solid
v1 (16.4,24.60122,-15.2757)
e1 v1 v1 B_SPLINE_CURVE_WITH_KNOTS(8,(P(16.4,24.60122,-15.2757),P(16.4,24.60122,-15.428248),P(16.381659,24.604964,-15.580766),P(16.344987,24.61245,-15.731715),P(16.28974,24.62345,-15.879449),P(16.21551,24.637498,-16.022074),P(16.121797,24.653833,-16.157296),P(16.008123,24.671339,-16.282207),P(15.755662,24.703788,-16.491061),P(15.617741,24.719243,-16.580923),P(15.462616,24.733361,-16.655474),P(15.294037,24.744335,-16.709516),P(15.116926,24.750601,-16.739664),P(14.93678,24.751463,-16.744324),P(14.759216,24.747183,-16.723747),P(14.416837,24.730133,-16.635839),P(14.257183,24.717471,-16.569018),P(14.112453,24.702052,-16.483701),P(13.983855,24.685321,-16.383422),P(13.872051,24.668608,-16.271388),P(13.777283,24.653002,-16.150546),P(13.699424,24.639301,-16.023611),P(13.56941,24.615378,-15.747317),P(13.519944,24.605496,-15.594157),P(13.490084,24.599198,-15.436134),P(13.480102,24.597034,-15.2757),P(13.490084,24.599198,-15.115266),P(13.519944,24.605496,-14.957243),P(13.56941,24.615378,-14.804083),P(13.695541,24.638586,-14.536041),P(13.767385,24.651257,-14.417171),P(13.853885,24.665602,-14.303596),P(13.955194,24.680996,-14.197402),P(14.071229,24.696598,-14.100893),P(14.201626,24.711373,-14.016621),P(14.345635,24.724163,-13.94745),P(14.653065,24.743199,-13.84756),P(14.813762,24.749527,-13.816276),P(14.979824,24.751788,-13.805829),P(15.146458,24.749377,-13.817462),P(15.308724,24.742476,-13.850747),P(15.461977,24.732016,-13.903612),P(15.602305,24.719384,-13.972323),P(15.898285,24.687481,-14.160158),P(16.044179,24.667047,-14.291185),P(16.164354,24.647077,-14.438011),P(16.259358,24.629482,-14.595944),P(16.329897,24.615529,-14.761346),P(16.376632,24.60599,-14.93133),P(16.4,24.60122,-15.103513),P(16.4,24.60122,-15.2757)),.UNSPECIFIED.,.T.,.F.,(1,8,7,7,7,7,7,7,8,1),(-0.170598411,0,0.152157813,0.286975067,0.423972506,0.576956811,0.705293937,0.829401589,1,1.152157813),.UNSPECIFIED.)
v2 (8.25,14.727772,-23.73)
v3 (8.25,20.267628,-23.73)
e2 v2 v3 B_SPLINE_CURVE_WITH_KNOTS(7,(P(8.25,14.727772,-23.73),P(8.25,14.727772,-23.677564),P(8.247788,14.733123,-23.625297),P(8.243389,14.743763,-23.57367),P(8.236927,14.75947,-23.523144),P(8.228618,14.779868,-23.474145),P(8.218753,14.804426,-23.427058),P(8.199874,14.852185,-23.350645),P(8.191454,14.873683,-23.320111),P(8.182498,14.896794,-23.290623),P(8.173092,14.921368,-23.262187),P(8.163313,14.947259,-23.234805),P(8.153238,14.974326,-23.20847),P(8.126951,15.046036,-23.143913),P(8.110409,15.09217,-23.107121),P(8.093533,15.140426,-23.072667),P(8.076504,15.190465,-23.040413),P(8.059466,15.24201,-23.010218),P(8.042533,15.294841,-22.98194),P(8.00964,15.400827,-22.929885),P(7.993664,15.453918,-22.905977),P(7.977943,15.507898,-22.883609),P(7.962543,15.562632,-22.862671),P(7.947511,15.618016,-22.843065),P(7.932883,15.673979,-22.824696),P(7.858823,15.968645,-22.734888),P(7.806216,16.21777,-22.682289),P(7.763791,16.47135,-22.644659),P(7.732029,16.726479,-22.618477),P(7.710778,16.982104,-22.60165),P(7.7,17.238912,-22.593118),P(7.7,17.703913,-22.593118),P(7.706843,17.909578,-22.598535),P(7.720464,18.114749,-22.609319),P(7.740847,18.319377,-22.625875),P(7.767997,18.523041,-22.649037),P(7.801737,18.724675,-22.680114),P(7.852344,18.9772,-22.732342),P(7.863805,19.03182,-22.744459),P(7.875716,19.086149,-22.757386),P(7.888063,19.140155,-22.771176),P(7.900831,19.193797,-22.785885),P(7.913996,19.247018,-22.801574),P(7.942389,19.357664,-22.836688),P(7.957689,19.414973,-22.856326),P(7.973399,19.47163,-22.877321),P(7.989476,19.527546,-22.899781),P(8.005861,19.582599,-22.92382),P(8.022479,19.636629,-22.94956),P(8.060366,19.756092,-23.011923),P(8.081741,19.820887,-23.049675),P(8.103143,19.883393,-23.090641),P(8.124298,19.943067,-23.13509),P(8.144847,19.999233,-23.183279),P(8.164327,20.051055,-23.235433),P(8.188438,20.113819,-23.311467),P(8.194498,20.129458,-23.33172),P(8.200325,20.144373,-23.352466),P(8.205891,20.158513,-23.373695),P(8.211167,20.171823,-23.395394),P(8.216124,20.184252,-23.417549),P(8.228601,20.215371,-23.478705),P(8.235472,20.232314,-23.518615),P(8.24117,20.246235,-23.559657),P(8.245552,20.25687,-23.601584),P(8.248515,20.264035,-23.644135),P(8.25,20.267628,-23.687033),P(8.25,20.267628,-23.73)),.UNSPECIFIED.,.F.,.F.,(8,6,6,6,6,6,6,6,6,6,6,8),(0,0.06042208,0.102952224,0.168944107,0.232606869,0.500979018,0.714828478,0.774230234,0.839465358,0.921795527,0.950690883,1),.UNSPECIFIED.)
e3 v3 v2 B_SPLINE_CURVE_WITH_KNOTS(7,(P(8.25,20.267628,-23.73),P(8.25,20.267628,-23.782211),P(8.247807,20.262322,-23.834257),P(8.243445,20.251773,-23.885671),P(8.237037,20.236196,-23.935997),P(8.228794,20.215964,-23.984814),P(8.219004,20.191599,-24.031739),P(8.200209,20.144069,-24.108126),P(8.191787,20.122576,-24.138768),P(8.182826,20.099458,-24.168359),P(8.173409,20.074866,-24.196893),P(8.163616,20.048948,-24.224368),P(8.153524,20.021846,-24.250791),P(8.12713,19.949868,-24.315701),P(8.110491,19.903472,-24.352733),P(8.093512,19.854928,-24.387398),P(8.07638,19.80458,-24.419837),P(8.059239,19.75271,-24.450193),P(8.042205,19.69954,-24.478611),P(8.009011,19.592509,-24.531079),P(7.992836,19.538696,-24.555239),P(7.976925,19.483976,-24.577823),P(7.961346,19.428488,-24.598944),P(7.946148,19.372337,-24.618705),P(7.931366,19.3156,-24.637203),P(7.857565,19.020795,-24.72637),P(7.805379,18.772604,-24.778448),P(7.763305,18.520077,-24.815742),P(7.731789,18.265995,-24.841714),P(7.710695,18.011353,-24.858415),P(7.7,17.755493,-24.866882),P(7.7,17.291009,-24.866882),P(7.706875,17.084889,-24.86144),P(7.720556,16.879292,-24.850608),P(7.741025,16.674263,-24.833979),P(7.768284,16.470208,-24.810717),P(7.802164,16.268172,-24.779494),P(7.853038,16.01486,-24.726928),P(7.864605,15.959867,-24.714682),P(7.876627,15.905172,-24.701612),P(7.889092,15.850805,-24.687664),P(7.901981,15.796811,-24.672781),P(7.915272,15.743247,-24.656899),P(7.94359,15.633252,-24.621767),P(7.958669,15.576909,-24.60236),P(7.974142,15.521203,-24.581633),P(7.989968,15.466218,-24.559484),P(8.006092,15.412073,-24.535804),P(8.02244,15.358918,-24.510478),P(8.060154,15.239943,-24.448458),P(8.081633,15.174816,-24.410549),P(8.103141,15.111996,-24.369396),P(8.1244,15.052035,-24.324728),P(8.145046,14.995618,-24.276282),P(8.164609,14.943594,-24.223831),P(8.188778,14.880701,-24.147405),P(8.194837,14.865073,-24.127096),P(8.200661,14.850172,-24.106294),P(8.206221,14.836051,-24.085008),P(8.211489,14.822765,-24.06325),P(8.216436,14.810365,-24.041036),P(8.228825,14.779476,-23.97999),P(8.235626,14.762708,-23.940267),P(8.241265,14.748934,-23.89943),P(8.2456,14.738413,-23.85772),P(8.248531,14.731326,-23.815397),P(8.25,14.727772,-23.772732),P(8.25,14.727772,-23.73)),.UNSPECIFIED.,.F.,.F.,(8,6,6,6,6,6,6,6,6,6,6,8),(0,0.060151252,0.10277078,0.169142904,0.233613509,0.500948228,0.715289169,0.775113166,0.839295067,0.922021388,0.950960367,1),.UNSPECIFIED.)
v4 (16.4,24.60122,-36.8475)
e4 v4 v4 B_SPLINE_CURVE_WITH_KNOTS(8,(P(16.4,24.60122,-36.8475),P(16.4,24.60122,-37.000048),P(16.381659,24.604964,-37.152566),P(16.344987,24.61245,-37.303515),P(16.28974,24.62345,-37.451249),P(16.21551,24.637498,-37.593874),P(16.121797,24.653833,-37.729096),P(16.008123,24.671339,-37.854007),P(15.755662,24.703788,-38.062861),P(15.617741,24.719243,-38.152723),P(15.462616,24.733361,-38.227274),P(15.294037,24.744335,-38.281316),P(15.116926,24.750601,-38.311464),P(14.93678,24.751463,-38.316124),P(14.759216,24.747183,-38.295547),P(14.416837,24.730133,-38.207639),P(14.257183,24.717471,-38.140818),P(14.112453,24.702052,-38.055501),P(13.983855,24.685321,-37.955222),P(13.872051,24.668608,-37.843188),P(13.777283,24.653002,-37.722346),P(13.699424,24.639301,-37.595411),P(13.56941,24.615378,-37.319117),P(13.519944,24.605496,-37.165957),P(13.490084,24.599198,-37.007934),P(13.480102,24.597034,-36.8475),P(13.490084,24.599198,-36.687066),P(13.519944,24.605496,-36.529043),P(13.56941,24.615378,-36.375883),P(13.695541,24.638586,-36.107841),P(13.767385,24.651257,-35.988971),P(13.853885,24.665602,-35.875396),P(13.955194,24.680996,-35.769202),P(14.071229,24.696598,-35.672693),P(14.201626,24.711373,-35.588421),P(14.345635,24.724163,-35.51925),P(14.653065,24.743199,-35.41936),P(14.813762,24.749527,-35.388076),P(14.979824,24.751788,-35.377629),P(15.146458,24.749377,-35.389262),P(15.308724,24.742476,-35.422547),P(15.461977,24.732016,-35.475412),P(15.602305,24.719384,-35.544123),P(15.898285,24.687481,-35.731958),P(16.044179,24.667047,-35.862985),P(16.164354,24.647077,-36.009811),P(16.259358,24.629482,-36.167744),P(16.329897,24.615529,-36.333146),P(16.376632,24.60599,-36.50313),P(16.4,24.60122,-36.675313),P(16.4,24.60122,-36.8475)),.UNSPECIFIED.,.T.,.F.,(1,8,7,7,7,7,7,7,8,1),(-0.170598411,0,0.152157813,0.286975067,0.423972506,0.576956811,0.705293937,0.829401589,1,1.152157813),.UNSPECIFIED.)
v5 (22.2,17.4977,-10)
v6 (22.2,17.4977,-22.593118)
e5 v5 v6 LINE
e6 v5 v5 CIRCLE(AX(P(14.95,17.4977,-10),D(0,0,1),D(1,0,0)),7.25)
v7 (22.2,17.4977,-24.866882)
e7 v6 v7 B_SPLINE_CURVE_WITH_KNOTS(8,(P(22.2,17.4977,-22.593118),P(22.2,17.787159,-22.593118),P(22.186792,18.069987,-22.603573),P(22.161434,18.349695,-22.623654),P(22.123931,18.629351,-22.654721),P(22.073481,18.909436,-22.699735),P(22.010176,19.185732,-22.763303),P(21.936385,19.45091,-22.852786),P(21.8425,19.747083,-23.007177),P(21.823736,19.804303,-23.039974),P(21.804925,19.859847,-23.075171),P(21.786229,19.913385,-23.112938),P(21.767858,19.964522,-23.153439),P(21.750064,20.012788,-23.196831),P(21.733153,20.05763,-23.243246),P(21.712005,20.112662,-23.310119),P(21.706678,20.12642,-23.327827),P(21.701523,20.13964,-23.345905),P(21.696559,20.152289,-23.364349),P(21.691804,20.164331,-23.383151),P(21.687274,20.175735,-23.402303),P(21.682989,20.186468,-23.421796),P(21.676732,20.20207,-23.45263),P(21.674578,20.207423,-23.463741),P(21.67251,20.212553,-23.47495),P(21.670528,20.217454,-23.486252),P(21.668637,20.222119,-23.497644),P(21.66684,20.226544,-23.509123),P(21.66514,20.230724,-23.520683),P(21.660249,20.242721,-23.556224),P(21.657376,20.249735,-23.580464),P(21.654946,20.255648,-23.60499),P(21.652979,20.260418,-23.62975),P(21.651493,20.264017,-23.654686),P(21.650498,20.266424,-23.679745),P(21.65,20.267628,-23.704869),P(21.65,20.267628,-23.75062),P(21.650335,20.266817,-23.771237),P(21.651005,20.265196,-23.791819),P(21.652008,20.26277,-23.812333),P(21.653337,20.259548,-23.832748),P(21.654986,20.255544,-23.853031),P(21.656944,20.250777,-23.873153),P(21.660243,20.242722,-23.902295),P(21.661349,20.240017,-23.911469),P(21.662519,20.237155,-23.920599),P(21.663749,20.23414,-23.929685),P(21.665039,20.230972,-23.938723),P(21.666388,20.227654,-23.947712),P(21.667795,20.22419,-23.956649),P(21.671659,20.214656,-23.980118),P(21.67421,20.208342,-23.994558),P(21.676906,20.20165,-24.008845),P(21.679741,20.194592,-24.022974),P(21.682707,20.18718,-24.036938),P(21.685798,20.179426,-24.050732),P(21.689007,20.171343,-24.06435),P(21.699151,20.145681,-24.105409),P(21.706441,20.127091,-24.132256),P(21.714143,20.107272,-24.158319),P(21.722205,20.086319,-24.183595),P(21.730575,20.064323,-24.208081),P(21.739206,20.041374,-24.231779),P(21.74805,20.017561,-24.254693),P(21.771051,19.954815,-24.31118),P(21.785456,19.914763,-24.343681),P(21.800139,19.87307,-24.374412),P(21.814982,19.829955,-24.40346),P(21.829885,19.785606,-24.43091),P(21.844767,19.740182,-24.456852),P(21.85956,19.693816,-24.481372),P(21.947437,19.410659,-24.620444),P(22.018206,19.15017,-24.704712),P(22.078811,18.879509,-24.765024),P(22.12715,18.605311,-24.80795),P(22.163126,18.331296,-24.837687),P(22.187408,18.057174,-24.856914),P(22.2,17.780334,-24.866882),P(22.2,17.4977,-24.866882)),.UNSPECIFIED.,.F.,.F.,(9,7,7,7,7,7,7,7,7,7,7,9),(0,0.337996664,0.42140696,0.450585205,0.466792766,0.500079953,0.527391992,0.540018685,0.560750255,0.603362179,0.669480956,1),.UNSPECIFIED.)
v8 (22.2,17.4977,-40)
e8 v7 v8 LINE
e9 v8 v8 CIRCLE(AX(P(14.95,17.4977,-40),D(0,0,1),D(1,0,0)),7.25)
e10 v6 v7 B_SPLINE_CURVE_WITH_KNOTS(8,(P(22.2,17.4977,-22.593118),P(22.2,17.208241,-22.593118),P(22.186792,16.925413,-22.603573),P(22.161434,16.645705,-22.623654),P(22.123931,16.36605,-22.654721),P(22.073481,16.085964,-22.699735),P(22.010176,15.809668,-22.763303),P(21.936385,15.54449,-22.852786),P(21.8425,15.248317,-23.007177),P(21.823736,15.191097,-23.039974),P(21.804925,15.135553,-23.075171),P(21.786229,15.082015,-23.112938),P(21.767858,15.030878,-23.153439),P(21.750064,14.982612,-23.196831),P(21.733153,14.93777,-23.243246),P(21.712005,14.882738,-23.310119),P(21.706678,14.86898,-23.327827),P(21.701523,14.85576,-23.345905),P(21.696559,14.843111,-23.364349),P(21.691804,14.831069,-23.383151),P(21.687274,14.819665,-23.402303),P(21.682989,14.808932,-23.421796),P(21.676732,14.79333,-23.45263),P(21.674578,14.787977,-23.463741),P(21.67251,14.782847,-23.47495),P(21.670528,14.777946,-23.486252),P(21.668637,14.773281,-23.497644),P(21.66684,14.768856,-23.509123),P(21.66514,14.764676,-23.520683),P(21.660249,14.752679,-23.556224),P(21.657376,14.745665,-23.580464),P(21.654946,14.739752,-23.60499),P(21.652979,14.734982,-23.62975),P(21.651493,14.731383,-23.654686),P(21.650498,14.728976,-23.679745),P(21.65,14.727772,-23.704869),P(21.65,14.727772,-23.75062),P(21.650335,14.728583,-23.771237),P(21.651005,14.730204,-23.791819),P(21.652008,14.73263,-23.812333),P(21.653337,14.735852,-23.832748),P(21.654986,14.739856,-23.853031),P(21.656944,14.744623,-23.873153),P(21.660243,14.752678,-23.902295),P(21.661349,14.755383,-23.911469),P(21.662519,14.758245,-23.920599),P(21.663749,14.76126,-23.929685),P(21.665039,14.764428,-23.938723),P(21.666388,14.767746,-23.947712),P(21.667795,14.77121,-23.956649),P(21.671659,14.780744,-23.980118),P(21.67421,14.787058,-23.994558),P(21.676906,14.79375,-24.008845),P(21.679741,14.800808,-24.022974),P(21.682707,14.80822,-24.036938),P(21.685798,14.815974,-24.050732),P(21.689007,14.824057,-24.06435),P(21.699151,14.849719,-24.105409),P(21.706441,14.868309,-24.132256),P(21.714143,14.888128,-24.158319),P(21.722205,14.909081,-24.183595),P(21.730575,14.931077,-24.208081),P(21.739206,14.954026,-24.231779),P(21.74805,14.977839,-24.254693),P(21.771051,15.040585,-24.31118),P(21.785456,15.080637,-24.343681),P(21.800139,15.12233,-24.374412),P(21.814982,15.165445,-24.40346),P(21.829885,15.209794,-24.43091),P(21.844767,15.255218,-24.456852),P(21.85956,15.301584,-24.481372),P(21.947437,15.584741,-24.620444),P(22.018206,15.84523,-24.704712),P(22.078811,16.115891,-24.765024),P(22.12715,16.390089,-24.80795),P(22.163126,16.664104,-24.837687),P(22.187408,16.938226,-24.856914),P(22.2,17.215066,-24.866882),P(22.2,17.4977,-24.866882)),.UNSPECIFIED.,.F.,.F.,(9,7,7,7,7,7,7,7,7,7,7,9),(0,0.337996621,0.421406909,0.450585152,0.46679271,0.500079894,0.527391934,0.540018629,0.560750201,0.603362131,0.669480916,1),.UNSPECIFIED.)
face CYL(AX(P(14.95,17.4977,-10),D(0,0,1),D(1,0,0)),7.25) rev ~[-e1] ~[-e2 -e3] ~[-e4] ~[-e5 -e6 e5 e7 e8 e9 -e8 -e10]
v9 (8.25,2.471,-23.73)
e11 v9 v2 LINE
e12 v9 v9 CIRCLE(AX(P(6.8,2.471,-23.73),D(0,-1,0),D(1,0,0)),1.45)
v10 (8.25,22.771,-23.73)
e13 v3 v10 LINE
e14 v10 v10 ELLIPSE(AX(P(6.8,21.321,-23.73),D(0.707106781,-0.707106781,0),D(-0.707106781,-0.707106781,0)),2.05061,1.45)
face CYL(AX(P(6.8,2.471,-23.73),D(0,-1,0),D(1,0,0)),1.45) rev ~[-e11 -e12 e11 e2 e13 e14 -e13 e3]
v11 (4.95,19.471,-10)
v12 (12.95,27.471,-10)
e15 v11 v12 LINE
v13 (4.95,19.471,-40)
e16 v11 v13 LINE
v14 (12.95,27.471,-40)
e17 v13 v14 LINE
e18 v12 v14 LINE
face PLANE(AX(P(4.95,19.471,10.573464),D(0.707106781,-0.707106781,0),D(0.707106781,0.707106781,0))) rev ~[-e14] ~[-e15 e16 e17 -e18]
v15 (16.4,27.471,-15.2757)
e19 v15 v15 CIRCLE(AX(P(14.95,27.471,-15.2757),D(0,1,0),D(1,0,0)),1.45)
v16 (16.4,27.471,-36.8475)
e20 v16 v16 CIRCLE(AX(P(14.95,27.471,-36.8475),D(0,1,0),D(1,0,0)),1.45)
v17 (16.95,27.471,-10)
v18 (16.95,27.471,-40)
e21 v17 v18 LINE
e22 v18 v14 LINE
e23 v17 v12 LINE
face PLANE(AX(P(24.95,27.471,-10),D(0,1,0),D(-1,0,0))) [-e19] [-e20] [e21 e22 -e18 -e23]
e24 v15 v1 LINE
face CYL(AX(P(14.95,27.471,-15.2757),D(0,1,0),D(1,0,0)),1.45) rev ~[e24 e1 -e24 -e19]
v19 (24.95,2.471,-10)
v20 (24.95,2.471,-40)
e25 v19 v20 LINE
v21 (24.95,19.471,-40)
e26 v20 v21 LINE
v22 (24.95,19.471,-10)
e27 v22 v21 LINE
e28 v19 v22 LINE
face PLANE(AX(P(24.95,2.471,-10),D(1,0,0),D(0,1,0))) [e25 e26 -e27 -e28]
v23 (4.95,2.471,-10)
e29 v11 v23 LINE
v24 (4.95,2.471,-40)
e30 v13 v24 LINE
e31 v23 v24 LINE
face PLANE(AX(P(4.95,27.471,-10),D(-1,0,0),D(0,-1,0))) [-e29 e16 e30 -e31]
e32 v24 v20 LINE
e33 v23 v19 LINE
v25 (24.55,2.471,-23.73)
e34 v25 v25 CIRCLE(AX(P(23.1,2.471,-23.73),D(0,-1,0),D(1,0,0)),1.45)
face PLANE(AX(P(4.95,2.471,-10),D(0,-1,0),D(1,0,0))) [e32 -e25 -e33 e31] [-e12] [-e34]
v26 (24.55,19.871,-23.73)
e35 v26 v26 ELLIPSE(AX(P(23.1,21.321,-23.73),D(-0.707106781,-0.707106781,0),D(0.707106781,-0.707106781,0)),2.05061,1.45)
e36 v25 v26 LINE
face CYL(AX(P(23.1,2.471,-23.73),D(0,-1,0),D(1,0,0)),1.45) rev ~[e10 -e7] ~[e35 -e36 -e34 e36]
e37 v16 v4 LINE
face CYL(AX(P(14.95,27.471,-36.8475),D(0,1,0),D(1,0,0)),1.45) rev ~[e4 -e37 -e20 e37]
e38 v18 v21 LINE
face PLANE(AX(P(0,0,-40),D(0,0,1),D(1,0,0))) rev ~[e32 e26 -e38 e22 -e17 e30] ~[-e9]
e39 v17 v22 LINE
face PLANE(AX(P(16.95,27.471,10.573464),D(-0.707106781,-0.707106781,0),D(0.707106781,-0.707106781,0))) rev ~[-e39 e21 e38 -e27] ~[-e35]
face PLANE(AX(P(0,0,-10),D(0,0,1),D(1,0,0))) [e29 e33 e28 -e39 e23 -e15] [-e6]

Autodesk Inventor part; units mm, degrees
ref_plane "YZ Plane" through (0, 0, 0) normal (1, 0, 0) x (0, 1, 0)
ref_plane "XZ Plane" through (0, 0, 0) normal (0, 1, 0) x (-1, 0, 0)
ref_plane "XY Plane" through (0, 0, 0) normal (0, 0, 1) x (1, 0, 0)
ref_plane "Work Plane1" through (0, 0, 0) normal (0, 0, 1) x (1, 0, 0)
ref_plane "Work Plane2" through (0, 0, -10) normal (0, 0, 1) x (1, 0, 0)
sketch "Sketch1" plane through (0, 0, -10) normal (0, 0, 1) x (1, 0, 0)
  circle A0 centre (14.95, 17.4977) radius 7.15 projected
  line L0 (0, 2.471) -> (29.9, 2.471) projected
  line L1 (0, 2.471) -> (0, 18.471) projected
  line L2 (0, 18.471) -> (-2, 18.471) projected
  line L3 (-2, 18.471) -> (-2, -1.5) projected
  line L4 (29.9, -1.5) -> (-2, -1.5) projected
  line L5 (29.9, -1.5) -> (29.9, 2.471) projected
  line L6 (4.95, 2.471) -> (24.95, 2.471)
  line L7 (24.95, 2.471) -> (24.95, 27.471)
  line L8 (24.95, 27.471) -> (4.95, 27.471)
  line L9 (4.95, 27.471) -> (4.95, 2.471)
  circle A1 centre (14.95, 17.4977) radius 7.25
  point P0 (0, 0)
  dimension "d6" = 20
  dimension "d7" = 25
  dimension "d8" = 10
  dimension "d9" = 0.1
extrude "Extrusion1" add sketch "Sketch1" against normal blind 30 contours L9 L8 L7 L0
sketch "Sketch2" plane through (4.95, 2.471, -10) normal (0, -1, 0) x (1, 0, 0)
  circle A0 centre (18.15, -13.73) radius 2.45 projected
  circle A1 centre (1.85, -13.73) radius 2.75 projected
  circle A2 centre (18.15, -13.73) radius 1.45
  circle A3 centre (1.85, -13.73) radius 1.45
  point P0 (-4.95, 10)
  dimension "d10" = 2.9
  dimension "d11" = 2.9
extrude "Extrusion2" cut sketch "Sketch2" against normal through all contours A2 | A3
chamfer "Chamfer1" distance 8 angle 45 2 edges at (24.95, 27.471, -25) (4.95, 27.471, -25)
sketch "Sketch3" plane through (12.95, 27.471, -10) normal (0, 1, 0) x (1, 0, 0)
  line L0 (0, 0) -> (0, 30) projected
  line L1 (4, 0) -> (0, 0) projected
  line L2 (4, 30) -> (4, 0) projected
  line L3 (0, 30) -> (4, 30) projected
  circle A0 centre (2, 5.2757) radius 1.45
  circle A1 centre (2, 26.8475) radius 1.45
  point P0 (-12.95, -10)
  dimension "d17" = 2.9
  dimension "d18" = 2.9
extrude "Extrusion3" cut sketch "Sketch3" against normal blind 10 contours A0 | A1
ref_plane "Work Plane3" through (0, 27.471, -10) normal (0, -0.7071068, 0.7071068) x (1, 0, 0)
ref_plane "Work Plane4" through (12.95, 27.471, -10) normal (0, 0.7071068, 0.7071068) x (1, 0, 0)
ref_plane "Work Plane5" through (14.95, 2.471, -10) normal (1, 0, 0) x (0, 0, -1)
sketch "Sketch5" plane through (14.95, 2.471, -10) normal (1, 0, 0) x (0, 0, -1)
  line L0 (0, 22.2768) -> (30, 22.2768) projected
  line L1 (0, 7.7768) -> (30, 7.7768) projected
  line L2 (0, 22.2768) -> (-4.2183, 22.2768)
  line L3 (-4.2183, 22.2768) -> (24.7731, 51.2681)
  line L4 (24.7731, 51.2681) -> (24.7731, 22.2768)
  point P0 (-10, -2.471)
  dimension "d21" = 41
  dimension "d22" = 45
properties part number "cellSTORM_v5_greenlaser_adapter"
